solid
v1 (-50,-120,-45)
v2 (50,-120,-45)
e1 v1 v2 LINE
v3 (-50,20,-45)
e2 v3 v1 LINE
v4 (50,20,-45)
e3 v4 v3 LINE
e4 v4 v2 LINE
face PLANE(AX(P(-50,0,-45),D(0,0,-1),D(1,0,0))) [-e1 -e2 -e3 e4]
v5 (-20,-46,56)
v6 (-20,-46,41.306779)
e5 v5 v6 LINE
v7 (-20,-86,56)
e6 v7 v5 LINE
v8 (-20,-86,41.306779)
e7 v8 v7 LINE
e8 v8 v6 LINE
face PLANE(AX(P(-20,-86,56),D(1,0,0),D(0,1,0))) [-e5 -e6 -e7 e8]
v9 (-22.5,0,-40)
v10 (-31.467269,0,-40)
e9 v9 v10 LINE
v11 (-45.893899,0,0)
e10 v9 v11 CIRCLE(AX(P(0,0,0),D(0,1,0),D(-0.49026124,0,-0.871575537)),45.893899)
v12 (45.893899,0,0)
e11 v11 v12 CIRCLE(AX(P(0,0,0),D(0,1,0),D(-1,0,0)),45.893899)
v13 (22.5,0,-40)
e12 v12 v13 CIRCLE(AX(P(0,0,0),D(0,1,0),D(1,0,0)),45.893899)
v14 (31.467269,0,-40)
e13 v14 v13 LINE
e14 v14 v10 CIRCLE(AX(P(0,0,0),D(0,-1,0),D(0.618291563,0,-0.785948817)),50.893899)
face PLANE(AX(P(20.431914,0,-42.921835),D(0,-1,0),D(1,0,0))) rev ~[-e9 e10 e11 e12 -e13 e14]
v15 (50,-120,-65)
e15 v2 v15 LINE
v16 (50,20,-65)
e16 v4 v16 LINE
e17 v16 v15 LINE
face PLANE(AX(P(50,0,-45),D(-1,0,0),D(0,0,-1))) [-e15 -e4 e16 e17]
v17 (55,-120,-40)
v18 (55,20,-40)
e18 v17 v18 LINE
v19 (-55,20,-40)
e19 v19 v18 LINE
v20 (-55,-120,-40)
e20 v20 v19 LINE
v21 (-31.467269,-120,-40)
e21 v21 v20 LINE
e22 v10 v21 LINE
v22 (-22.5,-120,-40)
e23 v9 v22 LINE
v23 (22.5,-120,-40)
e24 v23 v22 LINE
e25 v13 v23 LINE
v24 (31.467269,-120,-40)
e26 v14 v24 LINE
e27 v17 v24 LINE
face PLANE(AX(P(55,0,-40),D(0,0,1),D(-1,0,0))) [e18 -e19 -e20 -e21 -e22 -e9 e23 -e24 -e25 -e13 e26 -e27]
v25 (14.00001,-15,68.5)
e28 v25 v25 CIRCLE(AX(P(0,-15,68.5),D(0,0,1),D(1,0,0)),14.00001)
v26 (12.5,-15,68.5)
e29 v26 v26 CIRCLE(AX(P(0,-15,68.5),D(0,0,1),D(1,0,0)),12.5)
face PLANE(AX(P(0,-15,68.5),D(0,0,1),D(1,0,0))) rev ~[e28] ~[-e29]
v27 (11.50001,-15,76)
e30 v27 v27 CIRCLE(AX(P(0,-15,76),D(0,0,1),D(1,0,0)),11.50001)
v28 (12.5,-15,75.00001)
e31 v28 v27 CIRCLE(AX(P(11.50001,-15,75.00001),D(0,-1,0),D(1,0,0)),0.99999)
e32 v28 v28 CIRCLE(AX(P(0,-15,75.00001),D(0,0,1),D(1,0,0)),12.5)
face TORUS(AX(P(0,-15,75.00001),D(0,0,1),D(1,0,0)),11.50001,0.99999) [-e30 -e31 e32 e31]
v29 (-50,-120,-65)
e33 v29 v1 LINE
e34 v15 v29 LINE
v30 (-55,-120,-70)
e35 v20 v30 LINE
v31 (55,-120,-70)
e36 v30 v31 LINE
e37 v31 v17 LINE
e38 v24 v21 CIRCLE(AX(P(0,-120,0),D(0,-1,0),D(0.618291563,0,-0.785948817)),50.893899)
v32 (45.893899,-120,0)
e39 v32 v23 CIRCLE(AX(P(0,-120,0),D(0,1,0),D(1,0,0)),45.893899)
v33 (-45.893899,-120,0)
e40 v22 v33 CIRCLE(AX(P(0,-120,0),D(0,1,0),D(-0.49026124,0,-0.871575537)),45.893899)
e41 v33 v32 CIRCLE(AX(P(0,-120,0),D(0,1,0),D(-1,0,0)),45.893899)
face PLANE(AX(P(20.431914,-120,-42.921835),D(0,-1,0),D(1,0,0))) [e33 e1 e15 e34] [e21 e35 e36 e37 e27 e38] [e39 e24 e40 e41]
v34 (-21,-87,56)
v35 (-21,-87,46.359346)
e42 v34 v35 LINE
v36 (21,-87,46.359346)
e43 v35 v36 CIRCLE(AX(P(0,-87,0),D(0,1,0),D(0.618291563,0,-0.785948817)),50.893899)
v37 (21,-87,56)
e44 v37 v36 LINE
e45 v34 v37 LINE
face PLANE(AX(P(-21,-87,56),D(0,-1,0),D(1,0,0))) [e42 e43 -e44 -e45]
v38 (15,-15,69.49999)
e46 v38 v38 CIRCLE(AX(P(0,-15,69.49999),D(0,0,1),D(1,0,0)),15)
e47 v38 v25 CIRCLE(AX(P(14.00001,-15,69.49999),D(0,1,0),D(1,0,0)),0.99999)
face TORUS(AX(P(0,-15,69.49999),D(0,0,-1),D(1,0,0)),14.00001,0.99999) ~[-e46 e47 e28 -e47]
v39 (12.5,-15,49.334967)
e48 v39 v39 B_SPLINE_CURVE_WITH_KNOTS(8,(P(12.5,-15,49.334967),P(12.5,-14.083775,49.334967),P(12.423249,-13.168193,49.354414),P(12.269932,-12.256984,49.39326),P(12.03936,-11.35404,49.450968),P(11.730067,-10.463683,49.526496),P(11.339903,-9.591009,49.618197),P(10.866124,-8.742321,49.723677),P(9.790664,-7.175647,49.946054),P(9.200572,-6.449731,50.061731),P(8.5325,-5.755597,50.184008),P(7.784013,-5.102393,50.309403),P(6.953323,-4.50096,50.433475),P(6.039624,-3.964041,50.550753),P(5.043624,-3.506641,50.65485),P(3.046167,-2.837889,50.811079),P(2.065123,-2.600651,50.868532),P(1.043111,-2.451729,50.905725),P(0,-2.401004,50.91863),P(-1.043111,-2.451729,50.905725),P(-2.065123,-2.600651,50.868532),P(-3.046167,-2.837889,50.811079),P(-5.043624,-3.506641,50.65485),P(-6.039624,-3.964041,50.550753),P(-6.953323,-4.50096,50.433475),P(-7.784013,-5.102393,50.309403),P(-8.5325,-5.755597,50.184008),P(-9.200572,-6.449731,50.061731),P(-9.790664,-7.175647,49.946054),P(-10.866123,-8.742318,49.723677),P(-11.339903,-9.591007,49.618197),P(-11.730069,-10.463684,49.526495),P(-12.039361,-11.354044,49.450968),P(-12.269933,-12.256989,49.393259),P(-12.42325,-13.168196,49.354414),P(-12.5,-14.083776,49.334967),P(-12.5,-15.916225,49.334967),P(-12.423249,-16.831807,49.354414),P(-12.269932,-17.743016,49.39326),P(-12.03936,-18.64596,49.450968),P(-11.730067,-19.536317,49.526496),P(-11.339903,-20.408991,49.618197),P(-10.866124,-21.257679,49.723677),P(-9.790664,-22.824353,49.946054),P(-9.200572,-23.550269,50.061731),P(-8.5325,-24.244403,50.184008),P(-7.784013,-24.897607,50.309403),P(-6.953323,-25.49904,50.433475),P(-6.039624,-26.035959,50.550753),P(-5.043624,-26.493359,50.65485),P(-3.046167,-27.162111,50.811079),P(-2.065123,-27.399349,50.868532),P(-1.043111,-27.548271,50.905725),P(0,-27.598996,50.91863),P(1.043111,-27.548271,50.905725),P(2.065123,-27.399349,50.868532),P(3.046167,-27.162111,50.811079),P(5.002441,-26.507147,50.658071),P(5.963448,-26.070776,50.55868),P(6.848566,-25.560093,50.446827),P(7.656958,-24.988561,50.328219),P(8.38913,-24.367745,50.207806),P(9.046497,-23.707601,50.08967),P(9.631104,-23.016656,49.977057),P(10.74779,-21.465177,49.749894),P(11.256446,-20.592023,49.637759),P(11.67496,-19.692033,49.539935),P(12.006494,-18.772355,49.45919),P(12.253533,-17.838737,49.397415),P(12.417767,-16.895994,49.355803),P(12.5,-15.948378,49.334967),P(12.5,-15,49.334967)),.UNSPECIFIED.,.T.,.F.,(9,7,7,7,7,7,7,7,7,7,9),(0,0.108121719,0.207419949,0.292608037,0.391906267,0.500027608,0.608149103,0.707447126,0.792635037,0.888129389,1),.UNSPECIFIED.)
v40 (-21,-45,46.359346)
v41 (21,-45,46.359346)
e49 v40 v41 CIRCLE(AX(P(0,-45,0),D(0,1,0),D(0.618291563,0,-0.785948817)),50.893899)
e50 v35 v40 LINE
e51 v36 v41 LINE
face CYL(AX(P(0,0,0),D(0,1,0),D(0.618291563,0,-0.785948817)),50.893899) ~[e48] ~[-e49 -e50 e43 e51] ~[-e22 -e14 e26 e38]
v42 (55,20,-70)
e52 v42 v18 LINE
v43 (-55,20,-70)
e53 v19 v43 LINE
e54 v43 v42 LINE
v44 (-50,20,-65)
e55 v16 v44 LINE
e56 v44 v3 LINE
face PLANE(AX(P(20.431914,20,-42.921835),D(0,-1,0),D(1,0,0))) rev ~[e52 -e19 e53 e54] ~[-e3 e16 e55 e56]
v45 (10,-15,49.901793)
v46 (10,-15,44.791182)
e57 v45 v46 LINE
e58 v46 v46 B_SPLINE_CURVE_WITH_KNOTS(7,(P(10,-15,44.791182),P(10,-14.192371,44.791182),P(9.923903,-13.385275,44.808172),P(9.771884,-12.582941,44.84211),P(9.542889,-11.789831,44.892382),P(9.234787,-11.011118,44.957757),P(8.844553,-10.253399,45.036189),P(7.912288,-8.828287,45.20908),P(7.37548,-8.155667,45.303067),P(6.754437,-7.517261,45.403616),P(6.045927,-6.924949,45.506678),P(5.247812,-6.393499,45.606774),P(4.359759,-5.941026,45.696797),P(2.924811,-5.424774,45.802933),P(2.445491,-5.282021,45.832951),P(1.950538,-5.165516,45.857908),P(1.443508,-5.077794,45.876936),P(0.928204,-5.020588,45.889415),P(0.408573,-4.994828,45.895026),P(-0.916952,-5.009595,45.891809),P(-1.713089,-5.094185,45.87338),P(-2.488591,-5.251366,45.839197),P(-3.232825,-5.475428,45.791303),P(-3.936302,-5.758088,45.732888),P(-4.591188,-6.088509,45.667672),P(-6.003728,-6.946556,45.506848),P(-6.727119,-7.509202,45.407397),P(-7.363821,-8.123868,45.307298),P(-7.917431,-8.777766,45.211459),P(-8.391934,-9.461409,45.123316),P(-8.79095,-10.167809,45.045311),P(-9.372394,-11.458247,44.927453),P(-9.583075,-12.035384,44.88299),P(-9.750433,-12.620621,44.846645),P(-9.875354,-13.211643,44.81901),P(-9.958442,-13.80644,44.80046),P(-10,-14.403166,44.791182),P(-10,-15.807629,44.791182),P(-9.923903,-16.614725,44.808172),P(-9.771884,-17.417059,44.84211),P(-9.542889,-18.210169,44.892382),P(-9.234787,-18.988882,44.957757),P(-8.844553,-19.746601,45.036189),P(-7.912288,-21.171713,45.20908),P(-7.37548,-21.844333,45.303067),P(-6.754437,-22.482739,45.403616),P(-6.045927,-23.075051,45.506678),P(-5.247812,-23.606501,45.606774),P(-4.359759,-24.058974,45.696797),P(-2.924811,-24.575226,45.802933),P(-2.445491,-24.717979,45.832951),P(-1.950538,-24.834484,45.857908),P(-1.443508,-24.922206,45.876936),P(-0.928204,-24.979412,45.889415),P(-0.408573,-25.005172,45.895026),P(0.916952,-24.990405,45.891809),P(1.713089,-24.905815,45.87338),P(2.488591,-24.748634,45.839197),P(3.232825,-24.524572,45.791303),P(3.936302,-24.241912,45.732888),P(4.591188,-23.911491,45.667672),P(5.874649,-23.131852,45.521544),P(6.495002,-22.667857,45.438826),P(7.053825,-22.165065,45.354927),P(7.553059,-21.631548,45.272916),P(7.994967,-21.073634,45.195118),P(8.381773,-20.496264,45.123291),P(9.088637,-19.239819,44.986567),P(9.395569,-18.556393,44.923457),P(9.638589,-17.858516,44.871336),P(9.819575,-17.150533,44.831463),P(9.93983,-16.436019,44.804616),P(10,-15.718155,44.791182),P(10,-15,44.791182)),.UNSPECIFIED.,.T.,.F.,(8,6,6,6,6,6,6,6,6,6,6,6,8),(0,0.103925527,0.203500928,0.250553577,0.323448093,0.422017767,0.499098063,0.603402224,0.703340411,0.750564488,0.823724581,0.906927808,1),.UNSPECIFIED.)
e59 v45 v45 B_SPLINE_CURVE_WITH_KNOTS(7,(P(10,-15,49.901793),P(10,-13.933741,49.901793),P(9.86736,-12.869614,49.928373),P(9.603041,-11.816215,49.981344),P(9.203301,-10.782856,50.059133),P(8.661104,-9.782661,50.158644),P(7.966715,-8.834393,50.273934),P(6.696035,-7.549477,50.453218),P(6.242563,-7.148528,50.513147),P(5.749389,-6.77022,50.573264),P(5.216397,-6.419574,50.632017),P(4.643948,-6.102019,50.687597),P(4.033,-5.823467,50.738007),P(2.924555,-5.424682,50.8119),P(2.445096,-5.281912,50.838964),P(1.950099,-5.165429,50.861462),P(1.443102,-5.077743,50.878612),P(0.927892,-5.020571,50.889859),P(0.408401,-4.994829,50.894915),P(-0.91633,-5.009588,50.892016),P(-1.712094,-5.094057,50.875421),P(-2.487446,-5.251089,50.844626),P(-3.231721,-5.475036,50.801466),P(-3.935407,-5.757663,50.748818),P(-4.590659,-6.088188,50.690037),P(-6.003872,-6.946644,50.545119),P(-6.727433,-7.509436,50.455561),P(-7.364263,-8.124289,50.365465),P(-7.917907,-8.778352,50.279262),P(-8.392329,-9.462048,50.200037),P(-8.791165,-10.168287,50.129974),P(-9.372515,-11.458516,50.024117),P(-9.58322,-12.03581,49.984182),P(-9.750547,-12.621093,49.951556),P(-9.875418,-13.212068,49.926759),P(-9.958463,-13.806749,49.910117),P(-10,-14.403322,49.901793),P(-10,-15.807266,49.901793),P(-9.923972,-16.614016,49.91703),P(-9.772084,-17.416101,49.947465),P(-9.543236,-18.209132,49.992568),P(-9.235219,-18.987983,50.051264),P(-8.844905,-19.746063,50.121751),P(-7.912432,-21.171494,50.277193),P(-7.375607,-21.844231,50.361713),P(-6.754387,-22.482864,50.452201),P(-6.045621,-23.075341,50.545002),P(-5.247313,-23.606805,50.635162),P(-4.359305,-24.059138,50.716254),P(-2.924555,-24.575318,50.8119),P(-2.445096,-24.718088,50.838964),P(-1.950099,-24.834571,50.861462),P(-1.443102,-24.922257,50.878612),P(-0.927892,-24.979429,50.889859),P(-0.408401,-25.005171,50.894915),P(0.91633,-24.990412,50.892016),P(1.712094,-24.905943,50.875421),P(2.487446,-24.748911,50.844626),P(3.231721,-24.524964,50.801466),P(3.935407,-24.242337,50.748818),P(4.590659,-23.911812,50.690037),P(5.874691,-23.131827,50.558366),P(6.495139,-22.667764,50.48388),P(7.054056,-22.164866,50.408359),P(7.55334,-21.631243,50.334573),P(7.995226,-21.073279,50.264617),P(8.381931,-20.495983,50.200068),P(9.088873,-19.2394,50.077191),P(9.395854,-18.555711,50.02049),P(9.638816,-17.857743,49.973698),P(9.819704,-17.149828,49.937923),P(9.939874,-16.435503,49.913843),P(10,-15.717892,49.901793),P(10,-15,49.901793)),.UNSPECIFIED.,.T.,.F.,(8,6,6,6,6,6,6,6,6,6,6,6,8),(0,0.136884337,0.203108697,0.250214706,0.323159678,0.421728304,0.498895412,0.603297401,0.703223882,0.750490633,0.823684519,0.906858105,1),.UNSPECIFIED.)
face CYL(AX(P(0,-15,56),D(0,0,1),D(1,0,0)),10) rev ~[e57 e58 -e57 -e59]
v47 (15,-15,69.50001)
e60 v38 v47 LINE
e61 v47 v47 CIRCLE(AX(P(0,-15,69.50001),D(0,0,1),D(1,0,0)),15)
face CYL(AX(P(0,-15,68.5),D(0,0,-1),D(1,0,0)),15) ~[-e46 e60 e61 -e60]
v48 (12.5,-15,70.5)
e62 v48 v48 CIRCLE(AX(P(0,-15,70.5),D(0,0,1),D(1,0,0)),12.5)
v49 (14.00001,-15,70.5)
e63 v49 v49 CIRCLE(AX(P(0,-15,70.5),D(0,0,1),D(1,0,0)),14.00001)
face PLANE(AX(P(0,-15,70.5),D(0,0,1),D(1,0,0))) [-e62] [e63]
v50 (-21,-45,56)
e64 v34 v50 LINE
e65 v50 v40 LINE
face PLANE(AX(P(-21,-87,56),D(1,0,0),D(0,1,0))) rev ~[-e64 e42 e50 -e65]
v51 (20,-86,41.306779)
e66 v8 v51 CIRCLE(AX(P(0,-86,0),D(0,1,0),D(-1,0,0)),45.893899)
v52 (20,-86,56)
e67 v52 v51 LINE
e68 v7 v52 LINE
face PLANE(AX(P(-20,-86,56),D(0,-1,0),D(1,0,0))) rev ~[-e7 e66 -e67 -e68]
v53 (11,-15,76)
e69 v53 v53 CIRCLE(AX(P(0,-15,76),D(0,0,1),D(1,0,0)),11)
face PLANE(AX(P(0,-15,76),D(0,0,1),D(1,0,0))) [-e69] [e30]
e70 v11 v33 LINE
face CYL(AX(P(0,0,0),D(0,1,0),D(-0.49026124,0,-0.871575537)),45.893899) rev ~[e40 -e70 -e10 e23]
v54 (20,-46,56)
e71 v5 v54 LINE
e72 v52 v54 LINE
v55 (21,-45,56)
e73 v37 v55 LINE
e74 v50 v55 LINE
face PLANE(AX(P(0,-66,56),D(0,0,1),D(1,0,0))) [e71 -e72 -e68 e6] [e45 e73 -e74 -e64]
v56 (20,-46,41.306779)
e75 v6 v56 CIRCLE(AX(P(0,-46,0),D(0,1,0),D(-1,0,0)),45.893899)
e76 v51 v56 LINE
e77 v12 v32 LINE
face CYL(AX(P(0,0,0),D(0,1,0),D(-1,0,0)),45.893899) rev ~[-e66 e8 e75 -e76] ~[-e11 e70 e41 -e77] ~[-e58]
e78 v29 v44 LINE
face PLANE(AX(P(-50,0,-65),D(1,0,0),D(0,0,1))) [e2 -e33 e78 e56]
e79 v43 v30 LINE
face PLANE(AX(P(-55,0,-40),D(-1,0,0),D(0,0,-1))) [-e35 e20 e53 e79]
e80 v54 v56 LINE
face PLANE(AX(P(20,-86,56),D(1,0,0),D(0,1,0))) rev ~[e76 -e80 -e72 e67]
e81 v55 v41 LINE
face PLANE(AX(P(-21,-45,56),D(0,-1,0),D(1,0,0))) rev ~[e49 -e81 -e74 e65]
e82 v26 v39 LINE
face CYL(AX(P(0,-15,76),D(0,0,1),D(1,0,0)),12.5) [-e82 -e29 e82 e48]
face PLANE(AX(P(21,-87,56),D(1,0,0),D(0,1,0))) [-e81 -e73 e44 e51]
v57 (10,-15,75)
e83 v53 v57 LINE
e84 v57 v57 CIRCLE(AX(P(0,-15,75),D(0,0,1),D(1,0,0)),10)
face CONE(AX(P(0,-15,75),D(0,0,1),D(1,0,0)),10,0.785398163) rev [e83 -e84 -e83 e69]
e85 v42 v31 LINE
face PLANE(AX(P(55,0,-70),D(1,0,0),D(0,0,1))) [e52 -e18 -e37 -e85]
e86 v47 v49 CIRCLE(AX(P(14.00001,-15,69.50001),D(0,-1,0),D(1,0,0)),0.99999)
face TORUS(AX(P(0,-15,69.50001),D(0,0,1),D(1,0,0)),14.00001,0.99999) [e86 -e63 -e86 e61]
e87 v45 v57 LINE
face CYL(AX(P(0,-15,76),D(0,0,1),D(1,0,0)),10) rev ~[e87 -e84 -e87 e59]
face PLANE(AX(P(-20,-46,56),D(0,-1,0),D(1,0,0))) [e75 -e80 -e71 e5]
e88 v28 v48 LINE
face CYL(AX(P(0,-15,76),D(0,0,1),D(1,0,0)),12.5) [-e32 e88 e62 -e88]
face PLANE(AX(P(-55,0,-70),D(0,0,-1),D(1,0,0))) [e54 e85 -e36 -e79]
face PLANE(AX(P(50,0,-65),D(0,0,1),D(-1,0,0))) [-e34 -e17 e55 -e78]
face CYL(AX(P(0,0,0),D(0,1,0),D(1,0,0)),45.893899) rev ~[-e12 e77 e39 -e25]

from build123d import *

# Parameters (mm, degrees)
F1_DEPTH      = 120
F0_W          = 5
F0_H          = 5
F2_DEPTH      = 120
F2_DEPTH_BACK = 20
F6_R          = 12.5
F6_R_2        = 10
F7_DEPTH      = 30
F8_R          = 10
F9_DEPTH      = 25
F8_W          = 42
F8_H          = 42
F8_W_2        = 40
F8_H_2        = 40
F10_DEPTH     = 10
F11_DEPTH     = 25
F12_W         = 40
F12_H         = 30
F12_R         = 2.4384
F13_DEPTH     = 25
F16_R         = 15
F16_R_2       = 10
F17_DEPTH     = 2
F18_R         = 0.99999
F19_SIZE      = 1


# Not quite as in the source:
# - a fillet or chamfer is up to 0.001 mm smaller than in the source, because OpenCascade refuses the exact size
# - a feature of the source that left no trace in its solid (it failed there, or was rolled back) is left out
# - a feature names something its author has since deleted; it is built from what else it names


with BuildPart() as f1:
    # F0 (on Front) → F1 (new body)
    with BuildSketch(Plane.XZ):
        with BuildLine():
            ThreePointArc((-22.5, -40), (-39.6160493738, -23.1693468188), (-45.8938993767, 0))
            Line((-45.8938993767, 0), (-50.8938993767, 0))
            ThreePointArc((-50.8938993767, 0), (-45.7803505669, -22.233949171), (-31.4672686099, -40))
            Line((-31.4672686099, -40), (-22.5, -40))
        make_face()
        with BuildLine():
            Line((50.8938993767, 0), (45.8938993767, 0))
            ThreePointArc((45.8938993767, 0), (39.6160493738, -23.1693468188), (22.5, -40))
            Line((22.5, -40), (31.4672686099, -40))
            ThreePointArc((31.4672686099, -40), (45.7803505669, -22.233949171), (50.8938993767, 0))
        make_face()
        with BuildLine():
            ThreePointArc((-45.8938993767, 0), (0, 45.8938993767), (45.8938993767, 0))
            Line((45.8938993767, 0), (50.8938993767, 0))
            ThreePointArc((50.8938993767, 0), (0, 50.8938993767), (-50.8938993767, 0))
            Line((-50.8938993767, 0), (-45.8938993767, 0))
        make_face()
    extrude(amount=F1_DEPTH)

    # F0 (on Front) → F2 (join, two sides)
    with BuildSketch(Plane.XZ) as f2_sk:
        with BuildLine():
            Line((31.4672686099, -40), (22.5, -40))
            ThreePointArc((22.5, -40), (15.954031767, -43.0316031583), (9.0138781887, -45))
            Line((9.0138781887, -45), (23.7737038294, -45))
            ThreePointArc((23.7737038294, -45), (27.7333960958, -42.6737358894), (31.4672686099, -40))
        make_face()
        with BuildLine():
            ThreePointArc((9.0138781887, -45), (15.954031767, -43.0316031583), (22.5, -40))
            Line((22.5, -40), (0, -40))
            Line((0, -40), (-22.5, -40))
            ThreePointArc((-22.5, -40), (-15.954031767, -43.0316031583), (-9.0138781887, -45))
            Line((-9.0138781887, -45), (9.0138781887, -45))
        make_face()
        with BuildLine():
            ThreePointArc((-9.0138781887, -45), (-15.954031767, -43.0316031583), (-22.5, -40))
            Line((-22.5, -40), (-31.4672686099, -40))
            ThreePointArc((-31.4672686099, -40), (-27.7333960958, -42.6737358894), (-23.7737038294, -45))
            Line((-23.7737038294, -45), (-9.0138781887, -45))
        make_face()
        with BuildLine():
            ThreePointArc((-23.7737038294, -45), (-27.7333960958, -42.6737358894), (-31.4672686099, -40))
            Line((-31.4672686099, -40), (-55, -40))
            Line((-55, -40), (-55, -65))
            Line((-55, -65), (-50, -65))
            Line((-50, -65), (-50, -45))
            Line((-50, -45), (-23.7737038294, -45))
        make_face()
        with Locations((-52.5, -67.5)):
            Rectangle(F0_W, F0_H)
        with BuildLine():
            Line((55, -40), (31.4672686099, -40))
            ThreePointArc((31.4672686099, -40), (27.7333960958, -42.6737358894), (23.7737038294, -45))
            Line((23.7737038294, -45), (50, -45))
            Line((50, -45), (50, -65))
            Line((50, -65), (-50, -65))
            Line((-50, -65), (-50, -70))
            Line((-50, -70), (55, -70))
            Line((55, -70), (55, -40))
        make_face()
    extrude(amount=F2_DEPTH)
    extrude(f2_sk.sketch, amount=-F2_DEPTH_BACK)

    # F6 (on offset) → F7 (join)
    with BuildSketch(Plane.XY.offset(76)):
        with Locations((0, -15)):
            Circle(F6_R)
        with Locations((0, -15)):
            Circle(F6_R_2, mode=Mode.SUBTRACT)
    extrude(amount=-F7_DEPTH)

    # F8 (on offset) → F9 (cut)
    with BuildSketch(Plane.XY.offset(56)):
        with Locations((0, -15)):
            Circle(F8_R)
    extrude(amount=-F9_DEPTH, mode=Mode.SUBTRACT)

    # F8 (on offset) → F10 (join)
    with BuildSketch(Plane.XY.offset(56)):
        with Locations((0, -66)):
            Rectangle(F8_W, F8_H)
        with Locations((0, -66)):
            Rectangle(F8_W_2, F8_H_2, mode=Mode.SUBTRACT)
    extrude(amount=-F10_DEPTH)

    # F8 (on offset) → F11 (cut)
    with BuildSketch(Plane.XY.offset(56)):
        with Locations((0, -66)):
            Rectangle(F8_W_2, F8_H_2)
    extrude(amount=-F11_DEPTH, mode=Mode.SUBTRACT)

    # F12 (on face) → F13 (cut)
    with BuildSketch(Plane.XY.offset(-40)):
        with Locations((3.8294e-06, 35)):
            Rectangle(F12_W, F12_H)
        with Locations((0, 60)):
            Circle(F12_R)
    extrude(amount=-F13_DEPTH, mode=Mode.SUBTRACT)

    # F16 (on offset) → F17 (join)
    with BuildSketch(Plane.XY.offset(68.5)):
        with Locations((0, -15)):
            Circle(F16_R)
        with Locations((0, -15)):
            Circle(F16_R_2, mode=Mode.SUBTRACT)
    extrude(amount=F17_DEPTH)

    # F18 (radius 1 in the source; OpenCascade refuses exactly that, so slightly less here)
    f18_edges = [f1.edges().sort_by_distance(p)[0] for p in [
        (-15, -15, 70.5),
        (-15, -15, 68.5),
        (-12.5, -15, 76),
    ]]
    fillet(f18_edges, radius=F18_R)

    # F19
    f19_edges = [f1.edges().sort_by_distance(p)[0] for p in [
        (-10, -15, 76),
    ]]
    chamfer(f19_edges, length=F19_SIZE)


solid = f1.part
